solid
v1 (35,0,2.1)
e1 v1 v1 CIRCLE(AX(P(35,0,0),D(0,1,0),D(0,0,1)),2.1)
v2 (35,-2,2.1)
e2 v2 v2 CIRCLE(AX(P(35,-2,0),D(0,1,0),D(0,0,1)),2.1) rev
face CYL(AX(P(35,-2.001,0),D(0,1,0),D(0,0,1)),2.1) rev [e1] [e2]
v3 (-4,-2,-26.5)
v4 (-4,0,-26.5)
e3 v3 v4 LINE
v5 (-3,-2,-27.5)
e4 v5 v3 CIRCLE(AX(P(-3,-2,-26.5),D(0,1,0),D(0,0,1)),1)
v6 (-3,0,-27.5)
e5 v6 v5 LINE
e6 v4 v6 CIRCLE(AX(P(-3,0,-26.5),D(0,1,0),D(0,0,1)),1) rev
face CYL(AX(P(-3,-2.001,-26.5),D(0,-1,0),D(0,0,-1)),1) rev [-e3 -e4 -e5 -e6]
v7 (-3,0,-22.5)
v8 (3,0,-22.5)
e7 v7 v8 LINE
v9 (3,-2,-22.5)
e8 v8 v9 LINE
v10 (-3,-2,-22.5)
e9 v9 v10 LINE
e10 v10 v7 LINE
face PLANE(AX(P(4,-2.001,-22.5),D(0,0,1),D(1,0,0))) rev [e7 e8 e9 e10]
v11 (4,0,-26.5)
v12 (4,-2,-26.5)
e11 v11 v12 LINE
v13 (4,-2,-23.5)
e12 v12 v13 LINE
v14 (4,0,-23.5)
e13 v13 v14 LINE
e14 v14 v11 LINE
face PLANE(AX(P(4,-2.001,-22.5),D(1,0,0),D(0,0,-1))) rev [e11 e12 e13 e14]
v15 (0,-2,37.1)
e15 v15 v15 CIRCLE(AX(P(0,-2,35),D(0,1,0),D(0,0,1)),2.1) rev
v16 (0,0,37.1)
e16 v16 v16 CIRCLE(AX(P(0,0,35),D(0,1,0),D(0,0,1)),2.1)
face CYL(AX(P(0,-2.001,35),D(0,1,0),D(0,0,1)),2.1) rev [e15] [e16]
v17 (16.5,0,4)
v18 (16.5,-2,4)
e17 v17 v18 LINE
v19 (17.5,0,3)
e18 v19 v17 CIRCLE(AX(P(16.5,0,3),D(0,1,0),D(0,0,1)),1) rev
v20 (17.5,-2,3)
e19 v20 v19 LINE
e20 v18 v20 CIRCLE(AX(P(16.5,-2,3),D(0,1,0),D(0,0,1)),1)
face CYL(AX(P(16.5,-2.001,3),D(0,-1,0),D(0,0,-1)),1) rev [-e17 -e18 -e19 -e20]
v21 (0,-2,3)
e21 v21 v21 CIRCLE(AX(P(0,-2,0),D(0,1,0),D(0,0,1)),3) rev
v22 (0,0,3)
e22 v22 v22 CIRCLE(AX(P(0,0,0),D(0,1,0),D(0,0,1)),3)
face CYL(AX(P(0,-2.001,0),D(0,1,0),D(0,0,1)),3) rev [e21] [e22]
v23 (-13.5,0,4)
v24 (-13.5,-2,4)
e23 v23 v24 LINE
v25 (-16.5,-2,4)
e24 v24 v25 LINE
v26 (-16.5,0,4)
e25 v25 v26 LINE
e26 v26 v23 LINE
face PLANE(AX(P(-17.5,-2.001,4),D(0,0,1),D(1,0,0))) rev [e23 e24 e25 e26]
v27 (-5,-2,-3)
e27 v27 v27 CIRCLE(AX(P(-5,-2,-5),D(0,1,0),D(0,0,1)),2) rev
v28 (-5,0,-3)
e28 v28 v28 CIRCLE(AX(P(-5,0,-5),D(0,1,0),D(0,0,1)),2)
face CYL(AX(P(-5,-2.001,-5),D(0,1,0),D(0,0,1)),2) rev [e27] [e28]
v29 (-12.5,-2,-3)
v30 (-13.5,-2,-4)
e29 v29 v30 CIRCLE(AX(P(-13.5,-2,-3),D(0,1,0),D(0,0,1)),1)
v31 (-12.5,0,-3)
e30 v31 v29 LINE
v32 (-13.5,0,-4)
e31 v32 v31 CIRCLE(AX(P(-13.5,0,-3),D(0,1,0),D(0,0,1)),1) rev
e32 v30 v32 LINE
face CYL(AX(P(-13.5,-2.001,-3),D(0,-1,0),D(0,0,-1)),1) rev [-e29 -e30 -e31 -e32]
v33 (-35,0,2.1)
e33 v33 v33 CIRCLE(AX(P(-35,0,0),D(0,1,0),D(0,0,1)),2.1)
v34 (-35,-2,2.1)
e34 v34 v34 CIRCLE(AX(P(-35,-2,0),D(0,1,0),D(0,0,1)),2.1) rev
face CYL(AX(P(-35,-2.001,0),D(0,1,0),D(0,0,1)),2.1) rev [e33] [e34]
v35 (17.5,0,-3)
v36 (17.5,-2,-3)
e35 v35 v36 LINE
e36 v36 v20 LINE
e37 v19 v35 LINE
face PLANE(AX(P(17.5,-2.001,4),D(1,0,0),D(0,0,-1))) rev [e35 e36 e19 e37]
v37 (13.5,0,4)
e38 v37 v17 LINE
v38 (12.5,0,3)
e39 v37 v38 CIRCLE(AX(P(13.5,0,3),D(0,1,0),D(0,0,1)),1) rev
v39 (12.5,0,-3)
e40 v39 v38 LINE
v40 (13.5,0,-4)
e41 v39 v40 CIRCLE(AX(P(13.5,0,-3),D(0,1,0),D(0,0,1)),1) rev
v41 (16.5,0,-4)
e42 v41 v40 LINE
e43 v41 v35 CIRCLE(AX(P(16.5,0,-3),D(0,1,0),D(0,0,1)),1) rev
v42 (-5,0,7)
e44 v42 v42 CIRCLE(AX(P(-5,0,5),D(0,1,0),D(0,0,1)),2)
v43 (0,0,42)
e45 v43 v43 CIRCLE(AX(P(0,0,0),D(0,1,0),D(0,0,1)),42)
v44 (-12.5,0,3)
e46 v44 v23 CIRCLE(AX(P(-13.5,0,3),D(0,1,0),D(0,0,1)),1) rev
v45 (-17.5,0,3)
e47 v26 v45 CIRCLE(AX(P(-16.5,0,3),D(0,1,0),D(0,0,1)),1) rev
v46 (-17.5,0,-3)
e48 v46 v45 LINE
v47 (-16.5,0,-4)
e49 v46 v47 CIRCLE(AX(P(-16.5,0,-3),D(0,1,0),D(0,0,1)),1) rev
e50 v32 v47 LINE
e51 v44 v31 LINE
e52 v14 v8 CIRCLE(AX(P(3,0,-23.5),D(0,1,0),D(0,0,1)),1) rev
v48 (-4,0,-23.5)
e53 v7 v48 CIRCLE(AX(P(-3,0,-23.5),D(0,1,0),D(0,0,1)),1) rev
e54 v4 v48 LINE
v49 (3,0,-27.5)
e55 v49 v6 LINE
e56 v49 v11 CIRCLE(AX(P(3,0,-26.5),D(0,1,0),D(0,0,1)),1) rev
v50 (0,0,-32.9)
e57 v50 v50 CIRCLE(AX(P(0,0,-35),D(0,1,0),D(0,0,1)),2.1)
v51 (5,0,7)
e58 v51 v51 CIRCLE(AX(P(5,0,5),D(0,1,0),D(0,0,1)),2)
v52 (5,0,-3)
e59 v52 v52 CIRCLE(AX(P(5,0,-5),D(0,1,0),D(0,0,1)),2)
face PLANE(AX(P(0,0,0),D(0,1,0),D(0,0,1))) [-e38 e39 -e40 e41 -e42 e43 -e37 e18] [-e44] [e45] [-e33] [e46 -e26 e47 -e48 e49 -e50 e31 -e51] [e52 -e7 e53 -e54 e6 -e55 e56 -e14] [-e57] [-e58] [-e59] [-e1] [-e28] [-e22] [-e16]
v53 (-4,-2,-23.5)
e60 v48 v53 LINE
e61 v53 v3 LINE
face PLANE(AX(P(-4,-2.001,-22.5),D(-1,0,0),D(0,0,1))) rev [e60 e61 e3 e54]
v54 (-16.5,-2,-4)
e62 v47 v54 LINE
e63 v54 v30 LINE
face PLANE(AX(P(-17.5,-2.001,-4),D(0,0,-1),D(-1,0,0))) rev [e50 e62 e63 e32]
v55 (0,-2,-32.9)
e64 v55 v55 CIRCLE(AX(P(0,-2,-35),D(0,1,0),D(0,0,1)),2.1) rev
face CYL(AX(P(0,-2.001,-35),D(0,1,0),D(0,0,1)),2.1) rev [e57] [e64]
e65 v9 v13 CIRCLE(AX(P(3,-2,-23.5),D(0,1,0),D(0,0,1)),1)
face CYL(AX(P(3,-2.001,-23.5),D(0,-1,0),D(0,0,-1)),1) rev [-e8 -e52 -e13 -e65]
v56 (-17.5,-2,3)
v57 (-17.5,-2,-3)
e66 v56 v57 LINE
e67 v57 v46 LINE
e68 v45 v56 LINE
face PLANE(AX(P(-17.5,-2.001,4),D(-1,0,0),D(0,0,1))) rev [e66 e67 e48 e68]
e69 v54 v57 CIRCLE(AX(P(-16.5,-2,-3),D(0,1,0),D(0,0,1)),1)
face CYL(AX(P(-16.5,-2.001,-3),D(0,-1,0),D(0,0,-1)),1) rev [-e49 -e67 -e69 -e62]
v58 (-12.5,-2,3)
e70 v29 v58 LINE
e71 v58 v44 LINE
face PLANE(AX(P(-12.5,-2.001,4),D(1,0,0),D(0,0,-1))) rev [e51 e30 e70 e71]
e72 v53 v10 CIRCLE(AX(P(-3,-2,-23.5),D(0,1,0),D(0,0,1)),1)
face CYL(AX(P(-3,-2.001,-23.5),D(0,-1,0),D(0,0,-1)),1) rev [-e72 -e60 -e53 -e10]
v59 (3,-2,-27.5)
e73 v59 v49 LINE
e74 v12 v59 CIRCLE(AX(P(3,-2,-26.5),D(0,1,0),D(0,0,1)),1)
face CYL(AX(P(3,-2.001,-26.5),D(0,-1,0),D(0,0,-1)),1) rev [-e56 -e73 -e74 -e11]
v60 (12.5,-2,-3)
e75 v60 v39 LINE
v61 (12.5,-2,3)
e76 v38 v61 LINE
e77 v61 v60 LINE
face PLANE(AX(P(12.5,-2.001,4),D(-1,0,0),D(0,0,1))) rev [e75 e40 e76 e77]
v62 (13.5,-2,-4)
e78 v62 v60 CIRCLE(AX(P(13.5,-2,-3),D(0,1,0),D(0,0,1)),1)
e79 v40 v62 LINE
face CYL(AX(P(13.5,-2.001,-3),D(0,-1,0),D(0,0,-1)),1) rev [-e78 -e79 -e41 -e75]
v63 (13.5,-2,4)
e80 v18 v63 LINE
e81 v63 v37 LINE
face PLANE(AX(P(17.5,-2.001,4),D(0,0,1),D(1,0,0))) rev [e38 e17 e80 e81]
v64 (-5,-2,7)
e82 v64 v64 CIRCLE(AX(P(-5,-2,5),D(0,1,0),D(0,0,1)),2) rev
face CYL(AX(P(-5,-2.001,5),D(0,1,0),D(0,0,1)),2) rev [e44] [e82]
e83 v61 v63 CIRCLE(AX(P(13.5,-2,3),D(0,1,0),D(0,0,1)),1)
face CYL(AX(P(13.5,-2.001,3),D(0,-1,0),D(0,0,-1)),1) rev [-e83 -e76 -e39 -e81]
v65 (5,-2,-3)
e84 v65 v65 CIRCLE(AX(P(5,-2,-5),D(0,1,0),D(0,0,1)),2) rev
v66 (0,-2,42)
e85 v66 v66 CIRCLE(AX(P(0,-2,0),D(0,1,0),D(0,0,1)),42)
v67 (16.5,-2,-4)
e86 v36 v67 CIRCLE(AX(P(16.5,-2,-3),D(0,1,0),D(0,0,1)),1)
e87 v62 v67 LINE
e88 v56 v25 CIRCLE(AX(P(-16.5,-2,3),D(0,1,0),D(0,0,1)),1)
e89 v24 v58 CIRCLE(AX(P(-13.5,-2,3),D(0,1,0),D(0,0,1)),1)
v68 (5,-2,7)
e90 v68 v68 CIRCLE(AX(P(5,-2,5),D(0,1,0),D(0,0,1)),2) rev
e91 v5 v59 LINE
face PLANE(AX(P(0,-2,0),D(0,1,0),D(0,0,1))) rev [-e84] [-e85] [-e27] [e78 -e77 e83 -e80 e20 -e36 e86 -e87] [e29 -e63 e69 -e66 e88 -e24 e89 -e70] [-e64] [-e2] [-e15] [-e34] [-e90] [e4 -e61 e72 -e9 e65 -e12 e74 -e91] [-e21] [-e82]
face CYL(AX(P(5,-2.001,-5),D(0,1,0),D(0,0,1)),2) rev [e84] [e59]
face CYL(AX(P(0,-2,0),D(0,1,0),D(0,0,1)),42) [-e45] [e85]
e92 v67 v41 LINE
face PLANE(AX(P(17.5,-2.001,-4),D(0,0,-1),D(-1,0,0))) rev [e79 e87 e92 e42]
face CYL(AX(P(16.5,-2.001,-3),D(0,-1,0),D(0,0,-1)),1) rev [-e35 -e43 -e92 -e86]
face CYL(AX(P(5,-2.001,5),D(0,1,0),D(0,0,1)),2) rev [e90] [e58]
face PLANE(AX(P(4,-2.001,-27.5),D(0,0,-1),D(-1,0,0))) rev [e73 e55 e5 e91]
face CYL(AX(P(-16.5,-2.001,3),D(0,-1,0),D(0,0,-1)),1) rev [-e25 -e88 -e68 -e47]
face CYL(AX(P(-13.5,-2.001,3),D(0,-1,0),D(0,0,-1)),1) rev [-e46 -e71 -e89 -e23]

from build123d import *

# Parameters (mm, degrees)
SKETCH_1_R             = 42
SM_BASE_FLANGE_1_DEPTH = 2
CUT_EXTRUDE_1_REACH    = 61.431
SKETCH_6_R             = 2.1
SKETCH_6_R_2           = 3
SKETCH_6_R_3           = 2
SKETCH_6_W             = 8
SKETCH_6_H             = 5
SKETCH_6_W_2           = 5
SKETCH_6_H_2           = 8
FILLET_1_R             = 1


# Sheet-metal steps are written as plain solids
with BuildPart() as part:
    # Sketch 1 → 基体-法兰1 (new body)
    with BuildSketch(Plane(origin=(0, 0, 0), x_dir=(1, 0, 0), z_dir=(0, 1, 0))):
        with Locations(Location((0, 0, 0), (0, 0, 270))):
            Circle(SKETCH_1_R)
    extrude(amount=-SM_BASE_FLANGE_1_DEPTH)

    # 草图6 → 切除-拉伸1 (cut, up to next)
    with BuildSketch(Plane(origin=(0, 0, 0), x_dir=(1, 0, 0), z_dir=(0, 1, 0)), mode=Mode.PRIVATE) as cut_extrude_1_sk1:
        with Locations(Location((0, 35, 0), (0, 0, 270))):
            Circle(SKETCH_6_R)
    cut_extrude_1_tool1 = extrude(cut_extrude_1_sk1.sketch, amount=-CUT_EXTRUDE_1_REACH, mode=Mode.PRIVATE) & part.part
    # 草图6 → 切除-拉伸1 (cut, up to next)
    with BuildSketch(Plane(origin=(0, 0, 0), x_dir=(1, 0, 0), z_dir=(0, 1, 0)), mode=Mode.PRIVATE) as cut_extrude_1_sk2:
        with Locations(Location((35, 0, 0), (0, 0, 270))):
            Circle(SKETCH_6_R)
    cut_extrude_1_tool2 = extrude(cut_extrude_1_sk2.sketch, amount=-CUT_EXTRUDE_1_REACH, mode=Mode.PRIVATE) & part.part
    # 草图6 → 切除-拉伸1 (cut, up to next)
    with BuildSketch(Plane(origin=(0, 0, 0), x_dir=(1, 0, 0), z_dir=(0, 1, 0)), mode=Mode.PRIVATE) as cut_extrude_1_sk3:
        with Locations(Location((0, -35, 0), (0, 0, 270))):
            Circle(SKETCH_6_R)
    cut_extrude_1_tool3 = extrude(cut_extrude_1_sk3.sketch, amount=-CUT_EXTRUDE_1_REACH, mode=Mode.PRIVATE) & part.part
    # 草图6 → 切除-拉伸1 (cut, up to next)
    with BuildSketch(Plane(origin=(0, 0, 0), x_dir=(1, 0, 0), z_dir=(0, 1, 0)), mode=Mode.PRIVATE) as cut_extrude_1_sk4:
        with Locations(Location((-35, 0, 0), (0, 0, 270))):
            Circle(SKETCH_6_R)
    cut_extrude_1_tool4 = extrude(cut_extrude_1_sk4.sketch, amount=-CUT_EXTRUDE_1_REACH, mode=Mode.PRIVATE) & part.part
    # 草图6 → 切除-拉伸1 (cut, up to next)
    with BuildSketch(Plane(origin=(0, 0, 0), x_dir=(1, 0, 0), z_dir=(0, 1, 0)), mode=Mode.PRIVATE) as cut_extrude_1_sk5:
        with Locations(Location((0, 0, 0), (0, 0, 270))):
            Circle(SKETCH_6_R_2)
    cut_extrude_1_tool5 = extrude(cut_extrude_1_sk5.sketch, amount=-CUT_EXTRUDE_1_REACH, mode=Mode.PRIVATE) & part.part
    # 草图6 → 切除-拉伸1 (cut, up to next)
    with BuildSketch(Plane(origin=(0, 0, 0), x_dir=(1, 0, 0), z_dir=(0, 1, 0)), mode=Mode.PRIVATE) as cut_extrude_1_sk6:
        with Locations(Location((-5, 5, 0), (0, 0, 270))):
            Circle(SKETCH_6_R_3)
    cut_extrude_1_tool6 = extrude(cut_extrude_1_sk6.sketch, amount=-CUT_EXTRUDE_1_REACH, mode=Mode.PRIVATE) & part.part
    # 草图6 → 切除-拉伸1 (cut, up to next)
    with BuildSketch(Plane(origin=(0, 0, 0), x_dir=(1, 0, 0), z_dir=(0, 1, 0)), mode=Mode.PRIVATE) as cut_extrude_1_sk7:
        with Locations(Location((5, 5, 0), (0, 0, 270))):
            Circle(SKETCH_6_R_3)
    cut_extrude_1_tool7 = extrude(cut_extrude_1_sk7.sketch, amount=-CUT_EXTRUDE_1_REACH, mode=Mode.PRIVATE) & part.part
    # 草图6 → 切除-拉伸1 (cut, up to next)
    with BuildSketch(Plane(origin=(0, 0, 0), x_dir=(1, 0, 0), z_dir=(0, 1, 0)), mode=Mode.PRIVATE) as cut_extrude_1_sk8:
        with Locations(Location((5, -5, 0), (0, 0, 270))):
            Circle(SKETCH_6_R_3)
    cut_extrude_1_tool8 = extrude(cut_extrude_1_sk8.sketch, amount=-CUT_EXTRUDE_1_REACH, mode=Mode.PRIVATE) & part.part
    # 草图6 → 切除-拉伸1 (cut, up to next)
    with BuildSketch(Plane(origin=(0, 0, 0), x_dir=(1, 0, 0), z_dir=(0, 1, 0)), mode=Mode.PRIVATE) as cut_extrude_1_sk9:
        with Locations(Location((-5, -5, 0), (0, 0, 270))):
            Circle(SKETCH_6_R_3)
    cut_extrude_1_tool9 = extrude(cut_extrude_1_sk9.sketch, amount=-CUT_EXTRUDE_1_REACH, mode=Mode.PRIVATE) & part.part
    # 草图6 → 切除-拉伸1 (cut, up to next)
    with BuildSketch(Plane(origin=(0, 0, 0), x_dir=(1, 0, 0), z_dir=(0, 1, 0)), mode=Mode.PRIVATE) as cut_extrude_1_sk10:
        with Locations((0, 25)):
            Rectangle(SKETCH_6_W, SKETCH_6_H)
    cut_extrude_1_tool10 = extrude(cut_extrude_1_sk10.sketch, amount=-CUT_EXTRUDE_1_REACH, mode=Mode.PRIVATE) & part.part
    # 草图6 → 切除-拉伸1 (cut, up to next)
    with BuildSketch(Plane(origin=(0, 0, 0), x_dir=(1, 0, 0), z_dir=(0, 1, 0)), mode=Mode.PRIVATE) as cut_extrude_1_sk11:
        with Locations((15, 0)):
            Rectangle(SKETCH_6_W_2, SKETCH_6_H_2)
    cut_extrude_1_tool11 = extrude(cut_extrude_1_sk11.sketch, amount=-CUT_EXTRUDE_1_REACH, mode=Mode.PRIVATE) & part.part
    # 草图6 → 切除-拉伸1 (cut, up to next)
    with BuildSketch(Plane(origin=(0, 0, 0), x_dir=(1, 0, 0), z_dir=(0, 1, 0)), mode=Mode.PRIVATE) as cut_extrude_1_sk12:
        with Locations((-15, 0)):
            Rectangle(SKETCH_6_W_2, SKETCH_6_H_2)
    cut_extrude_1_tool12 = extrude(cut_extrude_1_sk12.sketch, amount=-CUT_EXTRUDE_1_REACH, mode=Mode.PRIVATE) & part.part
    add(cut_extrude_1_tool1.solids().sort_by_distance((0, 0, -35))[0], mode=Mode.SUBTRACT)
    add(cut_extrude_1_tool2.solids().sort_by_distance((35, 0, 0))[0], mode=Mode.SUBTRACT)
    add(cut_extrude_1_tool3.solids().sort_by_distance((0, 0, 35))[0], mode=Mode.SUBTRACT)
    add(cut_extrude_1_tool4.solids().sort_by_distance((-35, 0, 0))[0], mode=Mode.SUBTRACT)
    add(cut_extrude_1_tool5.solids().sort_by_distance((0, 0, 0))[0], mode=Mode.SUBTRACT)
    add(cut_extrude_1_tool6.solids().sort_by_distance((-5, 0, -5))[0], mode=Mode.SUBTRACT)
    add(cut_extrude_1_tool7.solids().sort_by_distance((5, 0, -5))[0], mode=Mode.SUBTRACT)
    add(cut_extrude_1_tool8.solids().sort_by_distance((5, 0, 5))[0], mode=Mode.SUBTRACT)
    add(cut_extrude_1_tool9.solids().sort_by_distance((-5, 0, 5))[0], mode=Mode.SUBTRACT)
    add(cut_extrude_1_tool10.solids().sort_by_distance((0, 0, -25))[0], mode=Mode.SUBTRACT)
    add(cut_extrude_1_tool11.solids().sort_by_distance((15, 0, 0))[0], mode=Mode.SUBTRACT)
    add(cut_extrude_1_tool12.solids().sort_by_distance((-15, 0, 0))[0], mode=Mode.SUBTRACT)

    # 圆角1
    fillet_1_edges = [part.edges().sort_by_distance(p)[0] for p in [
        (17.5, -1, -4),
        (17.5, -1, 4),
        (12.5, -1, 4),
        (12.5, -1, -4),
        (-12.5, -1, -4),
        (-12.5, -1, 4),
        (-17.5, -1, 4),
        (-17.5, -1, -4),
        (-4, -1, -22.5),
        (-4, -1, -27.5),
        (4, -1, -27.5),
        (4, -1, -22.5),
    ]]
    fillet(fillet_1_edges, radius=FILLET_1_R)


solid = part.part
